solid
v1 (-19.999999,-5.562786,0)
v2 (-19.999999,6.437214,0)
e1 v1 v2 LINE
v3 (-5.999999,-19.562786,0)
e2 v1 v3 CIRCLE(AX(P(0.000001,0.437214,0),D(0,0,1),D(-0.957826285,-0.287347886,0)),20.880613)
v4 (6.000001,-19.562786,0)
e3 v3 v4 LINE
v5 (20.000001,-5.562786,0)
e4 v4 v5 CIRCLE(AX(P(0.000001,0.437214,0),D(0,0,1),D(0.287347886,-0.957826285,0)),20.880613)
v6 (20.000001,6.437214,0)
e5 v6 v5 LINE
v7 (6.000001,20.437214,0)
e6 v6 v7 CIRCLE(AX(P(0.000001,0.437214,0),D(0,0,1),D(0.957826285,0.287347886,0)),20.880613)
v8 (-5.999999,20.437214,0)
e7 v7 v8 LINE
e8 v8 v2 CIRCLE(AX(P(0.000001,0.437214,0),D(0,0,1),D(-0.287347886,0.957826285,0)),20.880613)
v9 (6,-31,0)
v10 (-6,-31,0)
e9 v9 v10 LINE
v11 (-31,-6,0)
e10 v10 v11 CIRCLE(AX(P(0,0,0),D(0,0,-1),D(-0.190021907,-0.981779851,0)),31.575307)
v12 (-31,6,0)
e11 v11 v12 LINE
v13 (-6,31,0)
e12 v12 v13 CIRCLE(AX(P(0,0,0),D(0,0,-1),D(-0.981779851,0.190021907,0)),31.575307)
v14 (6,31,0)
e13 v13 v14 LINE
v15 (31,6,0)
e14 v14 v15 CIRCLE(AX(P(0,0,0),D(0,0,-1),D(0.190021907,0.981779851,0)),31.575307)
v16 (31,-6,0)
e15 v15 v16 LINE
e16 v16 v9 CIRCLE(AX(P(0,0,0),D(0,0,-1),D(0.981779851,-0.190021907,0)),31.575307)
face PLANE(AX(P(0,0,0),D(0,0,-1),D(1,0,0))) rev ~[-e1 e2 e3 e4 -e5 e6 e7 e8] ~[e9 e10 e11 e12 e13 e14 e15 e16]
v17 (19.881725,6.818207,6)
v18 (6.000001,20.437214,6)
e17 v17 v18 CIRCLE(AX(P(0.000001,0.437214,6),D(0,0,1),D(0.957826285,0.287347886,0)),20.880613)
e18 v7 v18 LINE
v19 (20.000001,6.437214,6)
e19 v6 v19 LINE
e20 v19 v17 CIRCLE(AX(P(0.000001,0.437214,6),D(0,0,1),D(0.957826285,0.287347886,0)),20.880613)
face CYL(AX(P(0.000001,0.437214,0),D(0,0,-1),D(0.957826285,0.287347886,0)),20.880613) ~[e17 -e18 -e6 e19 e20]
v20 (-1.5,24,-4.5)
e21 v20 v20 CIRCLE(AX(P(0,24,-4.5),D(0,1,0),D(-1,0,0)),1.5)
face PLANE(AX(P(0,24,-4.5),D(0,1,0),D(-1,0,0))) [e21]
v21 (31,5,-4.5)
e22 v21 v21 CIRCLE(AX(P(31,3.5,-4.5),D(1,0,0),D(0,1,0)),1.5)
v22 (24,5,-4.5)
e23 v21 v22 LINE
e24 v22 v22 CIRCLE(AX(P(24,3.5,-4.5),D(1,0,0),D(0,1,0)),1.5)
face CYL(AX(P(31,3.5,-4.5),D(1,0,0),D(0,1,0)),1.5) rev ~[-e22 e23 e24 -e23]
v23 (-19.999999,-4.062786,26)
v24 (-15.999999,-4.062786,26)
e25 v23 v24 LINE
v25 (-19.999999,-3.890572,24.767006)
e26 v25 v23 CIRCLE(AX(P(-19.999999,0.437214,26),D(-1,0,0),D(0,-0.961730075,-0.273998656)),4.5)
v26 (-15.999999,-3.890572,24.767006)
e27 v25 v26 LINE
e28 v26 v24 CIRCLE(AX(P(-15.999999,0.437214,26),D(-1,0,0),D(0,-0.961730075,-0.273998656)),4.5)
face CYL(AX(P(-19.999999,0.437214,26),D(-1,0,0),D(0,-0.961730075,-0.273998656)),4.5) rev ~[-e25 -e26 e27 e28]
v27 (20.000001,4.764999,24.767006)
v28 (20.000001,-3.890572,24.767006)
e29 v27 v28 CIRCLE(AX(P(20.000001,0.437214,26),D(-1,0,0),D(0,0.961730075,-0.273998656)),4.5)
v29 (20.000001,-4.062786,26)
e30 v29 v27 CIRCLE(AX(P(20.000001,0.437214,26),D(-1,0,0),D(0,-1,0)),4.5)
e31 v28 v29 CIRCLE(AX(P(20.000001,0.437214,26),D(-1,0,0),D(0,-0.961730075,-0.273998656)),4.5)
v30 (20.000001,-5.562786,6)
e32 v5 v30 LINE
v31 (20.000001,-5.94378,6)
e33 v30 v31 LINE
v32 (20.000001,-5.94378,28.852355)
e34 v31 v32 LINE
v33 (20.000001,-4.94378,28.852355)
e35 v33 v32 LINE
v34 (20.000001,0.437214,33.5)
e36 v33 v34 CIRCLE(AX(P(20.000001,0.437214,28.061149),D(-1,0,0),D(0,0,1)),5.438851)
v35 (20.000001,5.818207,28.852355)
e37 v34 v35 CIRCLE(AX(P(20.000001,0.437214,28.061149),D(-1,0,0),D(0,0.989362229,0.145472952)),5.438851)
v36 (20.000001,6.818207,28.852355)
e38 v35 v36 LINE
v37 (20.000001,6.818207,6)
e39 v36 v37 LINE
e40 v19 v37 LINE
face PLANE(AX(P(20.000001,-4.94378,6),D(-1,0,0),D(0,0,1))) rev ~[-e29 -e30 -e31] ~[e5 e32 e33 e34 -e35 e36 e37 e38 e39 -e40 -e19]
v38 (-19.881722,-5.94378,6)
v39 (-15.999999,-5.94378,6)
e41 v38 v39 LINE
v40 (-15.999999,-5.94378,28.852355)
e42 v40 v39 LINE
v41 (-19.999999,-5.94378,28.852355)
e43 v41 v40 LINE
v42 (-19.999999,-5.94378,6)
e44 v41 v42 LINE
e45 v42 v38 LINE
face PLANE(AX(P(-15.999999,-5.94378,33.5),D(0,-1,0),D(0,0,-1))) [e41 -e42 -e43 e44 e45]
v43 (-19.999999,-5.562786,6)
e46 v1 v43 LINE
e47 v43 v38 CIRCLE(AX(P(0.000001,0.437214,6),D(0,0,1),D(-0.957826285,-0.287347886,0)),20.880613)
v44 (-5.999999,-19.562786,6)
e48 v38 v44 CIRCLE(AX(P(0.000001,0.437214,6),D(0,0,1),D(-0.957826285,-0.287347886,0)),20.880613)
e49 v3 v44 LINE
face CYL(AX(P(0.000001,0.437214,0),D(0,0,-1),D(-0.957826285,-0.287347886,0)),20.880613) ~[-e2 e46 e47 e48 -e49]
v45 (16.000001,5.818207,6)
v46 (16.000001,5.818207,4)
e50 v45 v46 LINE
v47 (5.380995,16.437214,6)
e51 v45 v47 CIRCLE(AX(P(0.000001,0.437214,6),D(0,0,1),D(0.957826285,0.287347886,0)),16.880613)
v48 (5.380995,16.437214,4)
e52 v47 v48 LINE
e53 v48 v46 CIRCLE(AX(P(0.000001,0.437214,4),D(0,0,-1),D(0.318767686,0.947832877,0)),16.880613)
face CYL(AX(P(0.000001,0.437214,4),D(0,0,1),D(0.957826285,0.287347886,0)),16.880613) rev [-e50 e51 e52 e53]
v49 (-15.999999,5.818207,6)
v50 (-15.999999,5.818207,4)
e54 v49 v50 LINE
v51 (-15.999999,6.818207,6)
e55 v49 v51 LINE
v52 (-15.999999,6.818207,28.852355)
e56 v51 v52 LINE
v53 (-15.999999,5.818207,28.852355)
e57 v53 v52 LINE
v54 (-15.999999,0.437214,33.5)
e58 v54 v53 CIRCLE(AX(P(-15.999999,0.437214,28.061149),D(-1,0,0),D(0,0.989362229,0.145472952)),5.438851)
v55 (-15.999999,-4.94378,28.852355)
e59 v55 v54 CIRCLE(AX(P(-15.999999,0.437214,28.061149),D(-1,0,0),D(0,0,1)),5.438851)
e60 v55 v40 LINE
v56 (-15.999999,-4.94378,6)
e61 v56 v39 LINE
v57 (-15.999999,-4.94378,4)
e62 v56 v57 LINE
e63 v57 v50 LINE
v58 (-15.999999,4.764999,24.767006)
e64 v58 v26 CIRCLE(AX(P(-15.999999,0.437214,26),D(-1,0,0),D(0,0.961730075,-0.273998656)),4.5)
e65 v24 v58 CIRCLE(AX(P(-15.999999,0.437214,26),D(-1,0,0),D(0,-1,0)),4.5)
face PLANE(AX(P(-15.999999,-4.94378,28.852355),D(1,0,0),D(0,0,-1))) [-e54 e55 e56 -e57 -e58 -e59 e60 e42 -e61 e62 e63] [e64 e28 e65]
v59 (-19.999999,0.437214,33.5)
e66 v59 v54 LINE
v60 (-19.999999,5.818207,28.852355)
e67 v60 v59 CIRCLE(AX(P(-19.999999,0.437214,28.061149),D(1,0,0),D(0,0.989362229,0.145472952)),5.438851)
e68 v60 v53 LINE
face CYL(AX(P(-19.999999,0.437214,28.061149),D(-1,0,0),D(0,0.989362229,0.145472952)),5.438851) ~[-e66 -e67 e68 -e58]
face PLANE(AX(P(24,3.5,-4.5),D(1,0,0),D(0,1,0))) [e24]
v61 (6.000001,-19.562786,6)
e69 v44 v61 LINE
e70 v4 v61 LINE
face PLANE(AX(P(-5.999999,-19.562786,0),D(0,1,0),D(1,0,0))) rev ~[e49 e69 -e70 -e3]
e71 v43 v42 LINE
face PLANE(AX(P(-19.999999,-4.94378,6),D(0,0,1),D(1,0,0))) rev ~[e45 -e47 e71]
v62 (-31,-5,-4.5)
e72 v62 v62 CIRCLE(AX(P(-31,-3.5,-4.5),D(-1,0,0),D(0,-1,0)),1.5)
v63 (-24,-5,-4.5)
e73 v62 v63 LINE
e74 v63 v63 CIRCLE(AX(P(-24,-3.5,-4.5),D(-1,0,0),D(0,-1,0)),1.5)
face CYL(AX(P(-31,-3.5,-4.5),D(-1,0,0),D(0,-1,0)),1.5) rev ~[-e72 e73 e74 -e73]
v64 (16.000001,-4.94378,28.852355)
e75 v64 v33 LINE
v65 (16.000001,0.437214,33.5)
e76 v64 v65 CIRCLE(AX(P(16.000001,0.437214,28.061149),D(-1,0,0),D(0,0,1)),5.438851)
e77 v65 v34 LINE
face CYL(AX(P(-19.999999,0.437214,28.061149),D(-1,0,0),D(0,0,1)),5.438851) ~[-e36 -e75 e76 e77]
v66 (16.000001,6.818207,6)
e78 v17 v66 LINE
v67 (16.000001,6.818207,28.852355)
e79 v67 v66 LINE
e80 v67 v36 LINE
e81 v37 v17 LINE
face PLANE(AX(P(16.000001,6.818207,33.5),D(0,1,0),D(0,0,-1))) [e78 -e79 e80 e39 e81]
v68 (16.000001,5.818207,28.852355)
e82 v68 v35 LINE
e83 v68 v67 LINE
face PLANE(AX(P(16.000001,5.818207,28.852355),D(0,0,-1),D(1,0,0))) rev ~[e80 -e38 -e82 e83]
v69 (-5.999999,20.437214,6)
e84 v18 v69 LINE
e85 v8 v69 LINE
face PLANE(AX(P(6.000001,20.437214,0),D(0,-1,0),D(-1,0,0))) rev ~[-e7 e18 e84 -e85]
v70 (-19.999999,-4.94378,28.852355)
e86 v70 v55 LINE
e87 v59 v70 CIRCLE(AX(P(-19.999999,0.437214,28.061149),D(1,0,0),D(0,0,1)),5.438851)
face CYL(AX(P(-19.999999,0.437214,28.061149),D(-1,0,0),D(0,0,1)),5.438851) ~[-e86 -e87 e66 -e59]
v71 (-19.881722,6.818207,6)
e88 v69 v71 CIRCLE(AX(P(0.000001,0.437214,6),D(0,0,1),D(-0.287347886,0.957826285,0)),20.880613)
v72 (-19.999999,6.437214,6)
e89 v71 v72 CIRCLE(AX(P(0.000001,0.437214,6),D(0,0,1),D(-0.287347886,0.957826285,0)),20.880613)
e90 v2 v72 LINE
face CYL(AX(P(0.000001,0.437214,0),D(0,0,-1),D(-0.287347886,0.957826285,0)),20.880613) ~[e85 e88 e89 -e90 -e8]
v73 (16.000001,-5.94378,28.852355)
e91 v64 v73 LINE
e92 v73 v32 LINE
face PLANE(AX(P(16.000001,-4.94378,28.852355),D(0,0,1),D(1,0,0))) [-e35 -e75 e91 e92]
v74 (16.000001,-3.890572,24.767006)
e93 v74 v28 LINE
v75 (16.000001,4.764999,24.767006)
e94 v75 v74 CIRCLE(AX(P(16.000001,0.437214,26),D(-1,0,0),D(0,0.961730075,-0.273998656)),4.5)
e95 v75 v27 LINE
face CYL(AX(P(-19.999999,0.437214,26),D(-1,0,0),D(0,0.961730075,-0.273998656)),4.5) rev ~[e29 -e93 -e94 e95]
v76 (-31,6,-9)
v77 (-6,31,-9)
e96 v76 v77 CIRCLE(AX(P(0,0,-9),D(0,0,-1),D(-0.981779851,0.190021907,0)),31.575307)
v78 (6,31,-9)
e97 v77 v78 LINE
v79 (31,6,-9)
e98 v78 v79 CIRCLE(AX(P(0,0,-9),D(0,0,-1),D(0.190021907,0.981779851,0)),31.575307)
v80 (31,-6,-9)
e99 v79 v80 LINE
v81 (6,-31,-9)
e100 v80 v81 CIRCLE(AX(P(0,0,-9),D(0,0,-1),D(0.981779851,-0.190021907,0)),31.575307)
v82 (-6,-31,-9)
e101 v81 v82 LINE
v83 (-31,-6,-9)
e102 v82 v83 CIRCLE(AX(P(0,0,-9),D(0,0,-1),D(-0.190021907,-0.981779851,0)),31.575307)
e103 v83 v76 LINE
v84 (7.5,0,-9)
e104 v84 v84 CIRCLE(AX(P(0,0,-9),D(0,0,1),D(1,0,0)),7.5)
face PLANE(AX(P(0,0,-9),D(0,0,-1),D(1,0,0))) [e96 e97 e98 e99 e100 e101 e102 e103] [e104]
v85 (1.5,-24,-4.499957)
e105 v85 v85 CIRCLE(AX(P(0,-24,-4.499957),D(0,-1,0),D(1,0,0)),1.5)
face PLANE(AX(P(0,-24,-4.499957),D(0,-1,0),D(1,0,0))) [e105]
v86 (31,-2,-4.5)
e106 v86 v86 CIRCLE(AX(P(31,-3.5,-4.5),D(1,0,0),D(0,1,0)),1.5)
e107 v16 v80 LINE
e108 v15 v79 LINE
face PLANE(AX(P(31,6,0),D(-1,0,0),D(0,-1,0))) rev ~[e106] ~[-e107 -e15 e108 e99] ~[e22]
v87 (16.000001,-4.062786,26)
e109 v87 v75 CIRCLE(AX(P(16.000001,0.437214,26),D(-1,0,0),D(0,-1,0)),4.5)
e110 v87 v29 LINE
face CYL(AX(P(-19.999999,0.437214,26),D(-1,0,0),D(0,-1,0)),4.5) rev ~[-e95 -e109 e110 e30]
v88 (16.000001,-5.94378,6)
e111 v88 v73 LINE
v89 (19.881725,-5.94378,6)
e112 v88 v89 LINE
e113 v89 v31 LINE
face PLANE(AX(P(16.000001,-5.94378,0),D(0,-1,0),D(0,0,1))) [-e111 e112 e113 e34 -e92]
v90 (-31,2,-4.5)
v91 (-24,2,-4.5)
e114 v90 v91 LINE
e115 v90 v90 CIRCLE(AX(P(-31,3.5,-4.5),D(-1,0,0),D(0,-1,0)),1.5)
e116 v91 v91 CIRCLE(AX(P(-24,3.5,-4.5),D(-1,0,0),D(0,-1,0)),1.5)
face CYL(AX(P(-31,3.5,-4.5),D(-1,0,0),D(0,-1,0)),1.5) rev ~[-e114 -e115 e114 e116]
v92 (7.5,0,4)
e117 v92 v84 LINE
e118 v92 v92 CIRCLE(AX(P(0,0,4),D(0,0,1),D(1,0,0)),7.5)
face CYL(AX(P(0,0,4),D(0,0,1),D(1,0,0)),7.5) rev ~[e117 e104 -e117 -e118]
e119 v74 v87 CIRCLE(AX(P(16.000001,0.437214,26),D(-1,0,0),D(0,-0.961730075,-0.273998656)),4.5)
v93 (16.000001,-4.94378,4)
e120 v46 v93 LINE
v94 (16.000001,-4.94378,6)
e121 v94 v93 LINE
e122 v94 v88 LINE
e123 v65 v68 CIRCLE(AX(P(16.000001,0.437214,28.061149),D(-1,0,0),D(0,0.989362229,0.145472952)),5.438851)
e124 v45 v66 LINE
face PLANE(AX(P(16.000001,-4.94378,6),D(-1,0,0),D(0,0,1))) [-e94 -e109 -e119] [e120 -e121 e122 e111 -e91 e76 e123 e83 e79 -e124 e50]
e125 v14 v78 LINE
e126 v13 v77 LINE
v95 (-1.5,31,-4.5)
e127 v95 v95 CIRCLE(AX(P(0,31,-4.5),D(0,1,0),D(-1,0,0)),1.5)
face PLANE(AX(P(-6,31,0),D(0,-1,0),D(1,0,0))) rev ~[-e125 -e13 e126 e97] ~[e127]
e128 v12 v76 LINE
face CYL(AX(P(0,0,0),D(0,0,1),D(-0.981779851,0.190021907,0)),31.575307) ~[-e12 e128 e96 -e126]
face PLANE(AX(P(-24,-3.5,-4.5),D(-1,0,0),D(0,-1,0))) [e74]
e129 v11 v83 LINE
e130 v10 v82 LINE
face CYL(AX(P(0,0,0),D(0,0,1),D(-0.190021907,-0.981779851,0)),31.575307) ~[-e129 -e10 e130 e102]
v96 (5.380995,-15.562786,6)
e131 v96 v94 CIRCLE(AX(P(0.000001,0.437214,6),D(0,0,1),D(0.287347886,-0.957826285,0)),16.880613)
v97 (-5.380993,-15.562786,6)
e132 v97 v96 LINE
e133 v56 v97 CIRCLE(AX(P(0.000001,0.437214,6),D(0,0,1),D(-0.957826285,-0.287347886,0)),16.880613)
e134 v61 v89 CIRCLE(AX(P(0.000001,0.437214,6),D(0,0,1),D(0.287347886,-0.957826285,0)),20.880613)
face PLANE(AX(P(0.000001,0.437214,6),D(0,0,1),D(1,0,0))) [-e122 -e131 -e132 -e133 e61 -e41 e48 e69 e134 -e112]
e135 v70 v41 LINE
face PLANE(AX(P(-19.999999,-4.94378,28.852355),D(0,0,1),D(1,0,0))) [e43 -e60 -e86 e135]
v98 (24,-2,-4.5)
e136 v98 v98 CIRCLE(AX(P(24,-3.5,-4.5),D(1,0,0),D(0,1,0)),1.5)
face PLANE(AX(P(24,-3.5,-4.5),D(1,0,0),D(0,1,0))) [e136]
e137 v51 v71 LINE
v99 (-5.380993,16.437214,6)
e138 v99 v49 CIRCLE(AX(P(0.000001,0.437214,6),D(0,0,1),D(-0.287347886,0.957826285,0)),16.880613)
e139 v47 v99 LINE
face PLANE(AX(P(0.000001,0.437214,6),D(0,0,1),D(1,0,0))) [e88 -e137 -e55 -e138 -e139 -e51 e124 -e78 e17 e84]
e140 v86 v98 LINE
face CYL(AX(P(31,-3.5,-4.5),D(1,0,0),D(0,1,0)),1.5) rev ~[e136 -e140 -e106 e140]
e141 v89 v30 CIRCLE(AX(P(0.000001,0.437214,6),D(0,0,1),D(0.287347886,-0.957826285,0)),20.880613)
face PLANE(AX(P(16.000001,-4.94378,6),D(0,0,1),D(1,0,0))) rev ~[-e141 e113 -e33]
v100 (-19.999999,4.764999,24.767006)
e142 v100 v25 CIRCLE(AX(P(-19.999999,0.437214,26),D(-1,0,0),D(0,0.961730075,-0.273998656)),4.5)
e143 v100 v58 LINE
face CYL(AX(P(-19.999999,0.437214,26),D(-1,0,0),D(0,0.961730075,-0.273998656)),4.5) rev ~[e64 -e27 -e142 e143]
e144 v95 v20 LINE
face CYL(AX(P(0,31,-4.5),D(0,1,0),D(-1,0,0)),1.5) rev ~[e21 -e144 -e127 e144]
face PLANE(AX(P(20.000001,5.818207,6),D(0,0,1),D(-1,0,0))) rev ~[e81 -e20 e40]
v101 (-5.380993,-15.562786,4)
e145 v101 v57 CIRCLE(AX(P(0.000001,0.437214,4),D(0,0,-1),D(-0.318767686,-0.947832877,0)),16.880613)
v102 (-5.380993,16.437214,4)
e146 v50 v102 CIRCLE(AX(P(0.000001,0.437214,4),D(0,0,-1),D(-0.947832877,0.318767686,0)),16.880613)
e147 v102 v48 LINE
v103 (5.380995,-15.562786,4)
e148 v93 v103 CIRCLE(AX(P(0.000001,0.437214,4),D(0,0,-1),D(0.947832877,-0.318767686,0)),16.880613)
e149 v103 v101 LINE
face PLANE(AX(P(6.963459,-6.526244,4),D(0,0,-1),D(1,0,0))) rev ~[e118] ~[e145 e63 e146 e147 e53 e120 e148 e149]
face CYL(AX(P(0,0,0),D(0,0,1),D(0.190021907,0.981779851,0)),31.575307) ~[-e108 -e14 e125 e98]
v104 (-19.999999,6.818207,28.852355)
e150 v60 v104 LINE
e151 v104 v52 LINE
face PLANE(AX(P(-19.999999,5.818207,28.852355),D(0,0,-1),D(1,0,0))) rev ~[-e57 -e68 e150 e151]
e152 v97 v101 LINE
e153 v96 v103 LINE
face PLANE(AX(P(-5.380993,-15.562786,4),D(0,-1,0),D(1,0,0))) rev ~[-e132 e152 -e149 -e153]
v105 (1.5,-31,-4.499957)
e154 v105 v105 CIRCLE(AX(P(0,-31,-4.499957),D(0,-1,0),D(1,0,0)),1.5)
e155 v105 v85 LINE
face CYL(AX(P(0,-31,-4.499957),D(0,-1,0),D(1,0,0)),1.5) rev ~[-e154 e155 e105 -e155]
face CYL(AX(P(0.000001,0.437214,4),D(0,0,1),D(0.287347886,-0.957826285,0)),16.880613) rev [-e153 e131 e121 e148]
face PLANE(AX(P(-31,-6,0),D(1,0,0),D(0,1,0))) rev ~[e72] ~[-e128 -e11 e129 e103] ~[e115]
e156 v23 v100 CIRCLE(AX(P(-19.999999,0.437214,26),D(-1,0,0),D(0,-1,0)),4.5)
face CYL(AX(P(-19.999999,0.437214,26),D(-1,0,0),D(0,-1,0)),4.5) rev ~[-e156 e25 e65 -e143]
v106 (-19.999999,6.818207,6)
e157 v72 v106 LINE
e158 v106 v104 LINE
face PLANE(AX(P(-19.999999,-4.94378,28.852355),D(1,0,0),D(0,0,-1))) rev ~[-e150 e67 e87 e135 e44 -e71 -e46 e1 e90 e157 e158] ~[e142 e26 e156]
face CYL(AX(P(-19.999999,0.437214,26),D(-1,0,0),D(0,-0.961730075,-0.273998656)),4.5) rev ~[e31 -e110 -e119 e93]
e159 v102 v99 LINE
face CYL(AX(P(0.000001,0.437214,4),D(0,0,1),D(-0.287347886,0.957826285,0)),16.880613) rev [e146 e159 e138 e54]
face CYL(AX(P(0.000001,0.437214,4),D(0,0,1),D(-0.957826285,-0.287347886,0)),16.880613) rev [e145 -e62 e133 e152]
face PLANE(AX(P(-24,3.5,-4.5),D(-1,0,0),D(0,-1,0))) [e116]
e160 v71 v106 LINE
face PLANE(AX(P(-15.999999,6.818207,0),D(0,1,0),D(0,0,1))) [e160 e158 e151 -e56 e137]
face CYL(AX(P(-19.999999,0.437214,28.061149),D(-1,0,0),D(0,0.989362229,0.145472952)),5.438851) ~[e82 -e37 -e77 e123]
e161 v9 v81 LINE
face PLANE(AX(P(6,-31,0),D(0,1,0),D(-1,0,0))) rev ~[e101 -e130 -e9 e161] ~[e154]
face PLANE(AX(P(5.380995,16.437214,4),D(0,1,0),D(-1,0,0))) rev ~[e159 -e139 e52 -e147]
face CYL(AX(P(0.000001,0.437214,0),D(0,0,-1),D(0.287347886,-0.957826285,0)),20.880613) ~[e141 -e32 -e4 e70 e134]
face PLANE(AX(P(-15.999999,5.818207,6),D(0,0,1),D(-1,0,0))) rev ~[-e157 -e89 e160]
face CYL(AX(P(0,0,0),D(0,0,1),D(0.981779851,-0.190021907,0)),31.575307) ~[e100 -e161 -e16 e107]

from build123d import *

# Parameters (mm, degrees)
F1_DEPTH  = 6
F2_T      = -4
F3_DEPTH  = 25.4
F4_W      = 10.761987894
F4_H      = 6
F4_H_2    = 27.5
F5_DEPTH  = 4
F6_W      = 10.761987894
F6_H      = 6
F6_H_2    = 27.5
F7_DEPTH  = 4
F9_DEPTH  = 50
F10_DEPTH = 50
F11_DEPTH = 50
F12_DEPTH = 1
F13_DEPTH = 1
F14_DEPTH = 1
F15_DEPTH = 1
F18_DEPTH = 4
F20_DEPTH = 9
F21_R     = 1.5
F22_DEPTH = 7
F23_R     = 1.5
F24_DEPTH = 7
F25_R     = 1.5
F26_DEPTH = 7
F27_R     = 1.5
F28_DEPTH = 7
F29_R     = 7.5
F30_DEPTH = 25.4


with BuildPart() as f1:
    # F0 (on Top) → F1 (new body)
    with BuildSketch(Plane.XY):
        with BuildLine():
            Line((6.0000014261, 20.4372135154), (1.4261e-06, 20.4372135154))
            Line((1.4261e-06, 20.4372135154), (-5.9999985739, 20.4372135154))
            ThreePointArc((-5.9999985739, 20.4372135154), (-14.7648216341, 15.2020365756), (-19.9999985739, 6.4372135154))
            Line((-19.9999985739, 6.4372135154), (-19.9999985739, 0.4372135154))
            Line((-19.9999985739, 0.4372135154), (-19.9999985739, -5.5627864846))
            ThreePointArc((-19.9999985739, -5.5627864846), (-14.7648216341, -14.3276095448), (-5.9999985739, -19.5627864846))
            Line((-5.9999985739, -19.5627864846), (1.4261e-06, -19.5627864846))
            Line((1.4261e-06, -19.5627864846), (6.0000014261, -19.5627864846))
            ThreePointArc((6.0000014261, -19.5627864846), (14.7648244863, -14.3276095448), (20.0000014261, -5.5627864846))
            Line((20.0000014261, -5.5627864846), (20.0000014261, 6.4372135154))
            ThreePointArc((20.0000014261, 6.4372135154), (14.7648244863, 15.2020365756), (6.0000014261, 20.4372135154))
        make_face()
    extrude(amount=F1_DEPTH)

    # F2
    f2_openings = [f1.faces().sort_by_distance(p)[0] for p in [
        (1e-06, 0.437214, 6),
    ]]
    offset(amount=F2_T, openings=f2_openings)

    # F3 (cut): a face of the model
    f3_faces = [f1.faces().sort_by_distance(p)[0] for p in [
        (1.4261e-06, 0.4372135154, 4),
    ]]
    extrude(f3_faces, amount=-F3_DEPTH, mode=Mode.SUBTRACT)

    # F4 (on face) → F5 (join)
    with BuildSketch(Plane(origin=(16.0000014261, 0, 0), x_dir=(0, -1, 0), z_dir=(-1, 0, 0))):
        with Locations((-0.4372135154, 3)):
            Rectangle(F4_W, F4_H)
        with Locations((-0.4372135154, 19.75)):
            Rectangle(F4_W, F4_H_2)
    extrude(amount=-F5_DEPTH)

    # F6 (on face) → F7 (join)
    with BuildSketch(Plane.YZ.offset(-15.9999985739)):
        with Locations((0.4372135154, 3)):
            Rectangle(F6_W, F6_H)
        with Locations((0.4372135154, 19.75)):
            Rectangle(F6_W, F6_H_2)
    extrude(amount=-F7_DEPTH)

    # F8 (on face) → F9 (cut)
    with BuildSketch(Plane(origin=(-19.9999985739, 0, 0), x_dir=(0, -1, 0), z_dir=(-1, 0, 0))):
        with BuildLine():
            Line((-5.8182074624, 33.5), (-5.8182074624, 28.852354537))
            ThreePointArc((-5.8182074624, 28.852354537), (-3.9923402433, 32.177236302), (-0.4372135154, 33.5))
            Line((-0.4372135154, 33.5), (-5.8182074624, 33.5))
        make_face()
    extrude(amount=-F9_DEPTH, mode=Mode.SUBTRACT)

    # F8 (on face) → F10 (cut)
    with BuildSketch(Plane(origin=(-19.9999985739, 0, 0), x_dir=(0, -1, 0), z_dir=(-1, 0, 0))):
        with BuildLine():
            ThreePointArc((-0.4372135154, 33.5), (3.1179132125, 32.177236302), (4.9437804316, 28.852354537))
            Line((4.9437804316, 28.852354537), (4.9437804316, 33.5))
            Line((4.9437804316, 33.5), (-0.4372135154, 33.5))
        make_face()
    extrude(amount=-F10_DEPTH, mode=Mode.SUBTRACT)

    # F8 (on face) → F11 (cut)
    with BuildSketch(Plane(origin=(-19.9999985739, 0, 0), x_dir=(0, -1, 0), z_dir=(-1, 0, 0))):
        with BuildLine():
            ThreePointArc((3.8905718212, 24.7670060502), (4.0195248668, 25.3775186809), (4.0627864846, 26))
            ThreePointArc((4.0627864846, 26), (-1.0596948345, 30.4567383822), (-4.764998852, 24.7670060502))
            ThreePointArc((-4.764998852, 24.7670060502), (-0.4372135154, 21.5), (3.8905718212, 24.7670060502))
        make_face()
    extrude(amount=-F11_DEPTH, mode=Mode.SUBTRACT)

    # F12 (add): a face of the model
    f12_faces = [f1.faces().sort_by_distance(p)[0] for p in [
        (-17.9999985739, 5.8182074624, 17.4261772685),
    ]]
    extrude(f12_faces, amount=F12_DEPTH)

    # F13 (add): a face of the model
    f13_faces = [f1.faces().sort_by_distance(p)[0] for p in [
        (-17.9999985739, -4.9437804316, 17.4261772685),
    ]]
    extrude(f13_faces, amount=F13_DEPTH)

    # F14 (add): a face of the model
    f14_faces = [f1.faces().sort_by_distance(p)[0] for p in [
        (18.0000014261, 5.8182074624, 17.4261772685),
    ]]
    extrude(f14_faces, amount=F14_DEPTH)

    # F15 (add): a face of the model
    f15_faces = [f1.faces().sort_by_distance(p)[0] for p in [
        (18.0000014261, -4.9437804316, 17.4261772685),
    ]]
    extrude(f15_faces, amount=F15_DEPTH)

    # F17 (on face) → F18 (join)
    with BuildSketch(Plane(origin=(0, 0, 0), x_dir=(1, 0, 0), z_dir=(0, 0, -1))):
        with BuildLine():
            Line((1.4261e-06, 15.5627864846), (1.4261e-06, -0.4372135154))
            Line((1.4261e-06, -0.4372135154), (16.0000014261, -0.4372135154))
            Line((16.0000014261, -0.4372135154), (16.0000014261, 4.9437804316))
            ThreePointArc((16.0000014261, 4.9437804316), (11.9363973616, 11.4991824201), (5.3809953731, 15.5627864846))
            Line((5.3809953731, 15.5627864846), (1.4261e-06, 15.5627864846))
        make_face()
        with BuildLine():
            Line((-15.9999985739, 4.9437804316), (-15.9999985739, -0.4372135154))
            Line((-15.9999985739, -0.4372135154), (1.4261e-06, -0.4372135154))
            Line((1.4261e-06, -0.4372135154), (1.4261e-06, 15.5627864846))
            Line((1.4261e-06, 15.5627864846), (-5.3809925209, 15.5627864846))
            ThreePointArc((-5.3809925209, 15.5627864846), (-11.9363945094, 11.4991824201), (-15.9999985739, 4.9437804316))
        make_face()
        with BuildLine():
            Line((1.4261e-06, -0.4372135154), (-15.9999985739, -0.4372135154))
            Line((-15.9999985739, -0.4372135154), (-15.9999985739, -5.8182074624))
            ThreePointArc((-15.9999985739, -5.8182074624), (-11.9363945094, -12.3736094509), (-5.3809925209, -16.4372135154))
            Line((-5.3809925209, -16.4372135154), (1.4261e-06, -16.4372135154))
            Line((1.4261e-06, -16.4372135154), (1.4261e-06, -0.4372135154))
        make_face()
        with BuildLine():
            Line((16.0000014261, -0.4372135154), (1.4261e-06, -0.4372135154))
            Line((1.4261e-06, -0.4372135154), (1.4261e-06, -16.4372135154))
            Line((1.4261e-06, -16.4372135154), (5.3809953731, -16.4372135154))
            ThreePointArc((5.3809953731, -16.4372135154), (11.9363973616, -12.3736094509), (16.0000014261, -5.8182074624))
            Line((16.0000014261, -5.8182074624), (16.0000014261, -0.4372135154))
        make_face()
    extrude(amount=-F18_DEPTH)

    # F19 (on face) → F20 (join)
    with BuildSketch(Plane(origin=(0, 0, 0), x_dir=(1, 0, 0), z_dir=(0, 0, -1))):
        with BuildLine():
            Line((6, 31), (0, 31))
            Line((0, 31), (-6, 31))
            ThreePointArc((-6, 31), (-22.3271135618, 22.3271135618), (-31, 6))
            Line((-31, 6), (-31, -6))
            ThreePointArc((-31, -6), (-22.3271135618, -22.3271135618), (-6, -31))
            Line((-6, -31), (6, -31))
            ThreePointArc((6, -31), (22.3271135618, -22.3271135618), (31, -6))
            Line((31, -6), (31, 0))
            Line((31, 0), (31, 6))
            ThreePointArc((31, 6), (22.3271135618, 22.3271135618), (6, 31))
        make_face()
    extrude(amount=F20_DEPTH)

    # F21 (on face) → F22 (cut)
    with BuildSketch(Plane.XZ.offset(31)):
        with Locations((0, -4.4999574302)):
            Circle(F21_R)
    extrude(amount=-F22_DEPTH, mode=Mode.SUBTRACT)

    # F23 (on face) → F24 (cut)
    with BuildSketch(Plane(origin=(0, 31, 0), x_dir=(-1, 0, 0), z_dir=(0, 1, 0))):
        with Locations((0, -4.5)):
            Circle(F23_R)
    extrude(amount=-F24_DEPTH, mode=Mode.SUBTRACT)

    # F25 (on face) → F26 (cut)
    with BuildSketch(Plane.YZ.offset(31)):
        with Locations((-3.5, -4.5)):
            Circle(F25_R)
        with Locations((3.5, -4.5)):
            Circle(F25_R)
    extrude(amount=-F26_DEPTH, mode=Mode.SUBTRACT)

    # F27 (on face) → F28 (cut)
    with BuildSketch(Plane(origin=(-31, 0, 0), x_dir=(0, -1, 0), z_dir=(-1, 0, 0))):
        with Locations((-3.5, -4.5)):
            Circle(F27_R)
        with Locations((3.5, -4.5)):
            Circle(F27_R)
    extrude(amount=-F28_DEPTH, mode=Mode.SUBTRACT)

    # F29 (on face) → F30 (cut)
    with BuildSketch(Plane.XY.offset(4)):
        Circle(F29_R)
    extrude(amount=-F30_DEPTH, mode=Mode.SUBTRACT)


solid = f1.part
